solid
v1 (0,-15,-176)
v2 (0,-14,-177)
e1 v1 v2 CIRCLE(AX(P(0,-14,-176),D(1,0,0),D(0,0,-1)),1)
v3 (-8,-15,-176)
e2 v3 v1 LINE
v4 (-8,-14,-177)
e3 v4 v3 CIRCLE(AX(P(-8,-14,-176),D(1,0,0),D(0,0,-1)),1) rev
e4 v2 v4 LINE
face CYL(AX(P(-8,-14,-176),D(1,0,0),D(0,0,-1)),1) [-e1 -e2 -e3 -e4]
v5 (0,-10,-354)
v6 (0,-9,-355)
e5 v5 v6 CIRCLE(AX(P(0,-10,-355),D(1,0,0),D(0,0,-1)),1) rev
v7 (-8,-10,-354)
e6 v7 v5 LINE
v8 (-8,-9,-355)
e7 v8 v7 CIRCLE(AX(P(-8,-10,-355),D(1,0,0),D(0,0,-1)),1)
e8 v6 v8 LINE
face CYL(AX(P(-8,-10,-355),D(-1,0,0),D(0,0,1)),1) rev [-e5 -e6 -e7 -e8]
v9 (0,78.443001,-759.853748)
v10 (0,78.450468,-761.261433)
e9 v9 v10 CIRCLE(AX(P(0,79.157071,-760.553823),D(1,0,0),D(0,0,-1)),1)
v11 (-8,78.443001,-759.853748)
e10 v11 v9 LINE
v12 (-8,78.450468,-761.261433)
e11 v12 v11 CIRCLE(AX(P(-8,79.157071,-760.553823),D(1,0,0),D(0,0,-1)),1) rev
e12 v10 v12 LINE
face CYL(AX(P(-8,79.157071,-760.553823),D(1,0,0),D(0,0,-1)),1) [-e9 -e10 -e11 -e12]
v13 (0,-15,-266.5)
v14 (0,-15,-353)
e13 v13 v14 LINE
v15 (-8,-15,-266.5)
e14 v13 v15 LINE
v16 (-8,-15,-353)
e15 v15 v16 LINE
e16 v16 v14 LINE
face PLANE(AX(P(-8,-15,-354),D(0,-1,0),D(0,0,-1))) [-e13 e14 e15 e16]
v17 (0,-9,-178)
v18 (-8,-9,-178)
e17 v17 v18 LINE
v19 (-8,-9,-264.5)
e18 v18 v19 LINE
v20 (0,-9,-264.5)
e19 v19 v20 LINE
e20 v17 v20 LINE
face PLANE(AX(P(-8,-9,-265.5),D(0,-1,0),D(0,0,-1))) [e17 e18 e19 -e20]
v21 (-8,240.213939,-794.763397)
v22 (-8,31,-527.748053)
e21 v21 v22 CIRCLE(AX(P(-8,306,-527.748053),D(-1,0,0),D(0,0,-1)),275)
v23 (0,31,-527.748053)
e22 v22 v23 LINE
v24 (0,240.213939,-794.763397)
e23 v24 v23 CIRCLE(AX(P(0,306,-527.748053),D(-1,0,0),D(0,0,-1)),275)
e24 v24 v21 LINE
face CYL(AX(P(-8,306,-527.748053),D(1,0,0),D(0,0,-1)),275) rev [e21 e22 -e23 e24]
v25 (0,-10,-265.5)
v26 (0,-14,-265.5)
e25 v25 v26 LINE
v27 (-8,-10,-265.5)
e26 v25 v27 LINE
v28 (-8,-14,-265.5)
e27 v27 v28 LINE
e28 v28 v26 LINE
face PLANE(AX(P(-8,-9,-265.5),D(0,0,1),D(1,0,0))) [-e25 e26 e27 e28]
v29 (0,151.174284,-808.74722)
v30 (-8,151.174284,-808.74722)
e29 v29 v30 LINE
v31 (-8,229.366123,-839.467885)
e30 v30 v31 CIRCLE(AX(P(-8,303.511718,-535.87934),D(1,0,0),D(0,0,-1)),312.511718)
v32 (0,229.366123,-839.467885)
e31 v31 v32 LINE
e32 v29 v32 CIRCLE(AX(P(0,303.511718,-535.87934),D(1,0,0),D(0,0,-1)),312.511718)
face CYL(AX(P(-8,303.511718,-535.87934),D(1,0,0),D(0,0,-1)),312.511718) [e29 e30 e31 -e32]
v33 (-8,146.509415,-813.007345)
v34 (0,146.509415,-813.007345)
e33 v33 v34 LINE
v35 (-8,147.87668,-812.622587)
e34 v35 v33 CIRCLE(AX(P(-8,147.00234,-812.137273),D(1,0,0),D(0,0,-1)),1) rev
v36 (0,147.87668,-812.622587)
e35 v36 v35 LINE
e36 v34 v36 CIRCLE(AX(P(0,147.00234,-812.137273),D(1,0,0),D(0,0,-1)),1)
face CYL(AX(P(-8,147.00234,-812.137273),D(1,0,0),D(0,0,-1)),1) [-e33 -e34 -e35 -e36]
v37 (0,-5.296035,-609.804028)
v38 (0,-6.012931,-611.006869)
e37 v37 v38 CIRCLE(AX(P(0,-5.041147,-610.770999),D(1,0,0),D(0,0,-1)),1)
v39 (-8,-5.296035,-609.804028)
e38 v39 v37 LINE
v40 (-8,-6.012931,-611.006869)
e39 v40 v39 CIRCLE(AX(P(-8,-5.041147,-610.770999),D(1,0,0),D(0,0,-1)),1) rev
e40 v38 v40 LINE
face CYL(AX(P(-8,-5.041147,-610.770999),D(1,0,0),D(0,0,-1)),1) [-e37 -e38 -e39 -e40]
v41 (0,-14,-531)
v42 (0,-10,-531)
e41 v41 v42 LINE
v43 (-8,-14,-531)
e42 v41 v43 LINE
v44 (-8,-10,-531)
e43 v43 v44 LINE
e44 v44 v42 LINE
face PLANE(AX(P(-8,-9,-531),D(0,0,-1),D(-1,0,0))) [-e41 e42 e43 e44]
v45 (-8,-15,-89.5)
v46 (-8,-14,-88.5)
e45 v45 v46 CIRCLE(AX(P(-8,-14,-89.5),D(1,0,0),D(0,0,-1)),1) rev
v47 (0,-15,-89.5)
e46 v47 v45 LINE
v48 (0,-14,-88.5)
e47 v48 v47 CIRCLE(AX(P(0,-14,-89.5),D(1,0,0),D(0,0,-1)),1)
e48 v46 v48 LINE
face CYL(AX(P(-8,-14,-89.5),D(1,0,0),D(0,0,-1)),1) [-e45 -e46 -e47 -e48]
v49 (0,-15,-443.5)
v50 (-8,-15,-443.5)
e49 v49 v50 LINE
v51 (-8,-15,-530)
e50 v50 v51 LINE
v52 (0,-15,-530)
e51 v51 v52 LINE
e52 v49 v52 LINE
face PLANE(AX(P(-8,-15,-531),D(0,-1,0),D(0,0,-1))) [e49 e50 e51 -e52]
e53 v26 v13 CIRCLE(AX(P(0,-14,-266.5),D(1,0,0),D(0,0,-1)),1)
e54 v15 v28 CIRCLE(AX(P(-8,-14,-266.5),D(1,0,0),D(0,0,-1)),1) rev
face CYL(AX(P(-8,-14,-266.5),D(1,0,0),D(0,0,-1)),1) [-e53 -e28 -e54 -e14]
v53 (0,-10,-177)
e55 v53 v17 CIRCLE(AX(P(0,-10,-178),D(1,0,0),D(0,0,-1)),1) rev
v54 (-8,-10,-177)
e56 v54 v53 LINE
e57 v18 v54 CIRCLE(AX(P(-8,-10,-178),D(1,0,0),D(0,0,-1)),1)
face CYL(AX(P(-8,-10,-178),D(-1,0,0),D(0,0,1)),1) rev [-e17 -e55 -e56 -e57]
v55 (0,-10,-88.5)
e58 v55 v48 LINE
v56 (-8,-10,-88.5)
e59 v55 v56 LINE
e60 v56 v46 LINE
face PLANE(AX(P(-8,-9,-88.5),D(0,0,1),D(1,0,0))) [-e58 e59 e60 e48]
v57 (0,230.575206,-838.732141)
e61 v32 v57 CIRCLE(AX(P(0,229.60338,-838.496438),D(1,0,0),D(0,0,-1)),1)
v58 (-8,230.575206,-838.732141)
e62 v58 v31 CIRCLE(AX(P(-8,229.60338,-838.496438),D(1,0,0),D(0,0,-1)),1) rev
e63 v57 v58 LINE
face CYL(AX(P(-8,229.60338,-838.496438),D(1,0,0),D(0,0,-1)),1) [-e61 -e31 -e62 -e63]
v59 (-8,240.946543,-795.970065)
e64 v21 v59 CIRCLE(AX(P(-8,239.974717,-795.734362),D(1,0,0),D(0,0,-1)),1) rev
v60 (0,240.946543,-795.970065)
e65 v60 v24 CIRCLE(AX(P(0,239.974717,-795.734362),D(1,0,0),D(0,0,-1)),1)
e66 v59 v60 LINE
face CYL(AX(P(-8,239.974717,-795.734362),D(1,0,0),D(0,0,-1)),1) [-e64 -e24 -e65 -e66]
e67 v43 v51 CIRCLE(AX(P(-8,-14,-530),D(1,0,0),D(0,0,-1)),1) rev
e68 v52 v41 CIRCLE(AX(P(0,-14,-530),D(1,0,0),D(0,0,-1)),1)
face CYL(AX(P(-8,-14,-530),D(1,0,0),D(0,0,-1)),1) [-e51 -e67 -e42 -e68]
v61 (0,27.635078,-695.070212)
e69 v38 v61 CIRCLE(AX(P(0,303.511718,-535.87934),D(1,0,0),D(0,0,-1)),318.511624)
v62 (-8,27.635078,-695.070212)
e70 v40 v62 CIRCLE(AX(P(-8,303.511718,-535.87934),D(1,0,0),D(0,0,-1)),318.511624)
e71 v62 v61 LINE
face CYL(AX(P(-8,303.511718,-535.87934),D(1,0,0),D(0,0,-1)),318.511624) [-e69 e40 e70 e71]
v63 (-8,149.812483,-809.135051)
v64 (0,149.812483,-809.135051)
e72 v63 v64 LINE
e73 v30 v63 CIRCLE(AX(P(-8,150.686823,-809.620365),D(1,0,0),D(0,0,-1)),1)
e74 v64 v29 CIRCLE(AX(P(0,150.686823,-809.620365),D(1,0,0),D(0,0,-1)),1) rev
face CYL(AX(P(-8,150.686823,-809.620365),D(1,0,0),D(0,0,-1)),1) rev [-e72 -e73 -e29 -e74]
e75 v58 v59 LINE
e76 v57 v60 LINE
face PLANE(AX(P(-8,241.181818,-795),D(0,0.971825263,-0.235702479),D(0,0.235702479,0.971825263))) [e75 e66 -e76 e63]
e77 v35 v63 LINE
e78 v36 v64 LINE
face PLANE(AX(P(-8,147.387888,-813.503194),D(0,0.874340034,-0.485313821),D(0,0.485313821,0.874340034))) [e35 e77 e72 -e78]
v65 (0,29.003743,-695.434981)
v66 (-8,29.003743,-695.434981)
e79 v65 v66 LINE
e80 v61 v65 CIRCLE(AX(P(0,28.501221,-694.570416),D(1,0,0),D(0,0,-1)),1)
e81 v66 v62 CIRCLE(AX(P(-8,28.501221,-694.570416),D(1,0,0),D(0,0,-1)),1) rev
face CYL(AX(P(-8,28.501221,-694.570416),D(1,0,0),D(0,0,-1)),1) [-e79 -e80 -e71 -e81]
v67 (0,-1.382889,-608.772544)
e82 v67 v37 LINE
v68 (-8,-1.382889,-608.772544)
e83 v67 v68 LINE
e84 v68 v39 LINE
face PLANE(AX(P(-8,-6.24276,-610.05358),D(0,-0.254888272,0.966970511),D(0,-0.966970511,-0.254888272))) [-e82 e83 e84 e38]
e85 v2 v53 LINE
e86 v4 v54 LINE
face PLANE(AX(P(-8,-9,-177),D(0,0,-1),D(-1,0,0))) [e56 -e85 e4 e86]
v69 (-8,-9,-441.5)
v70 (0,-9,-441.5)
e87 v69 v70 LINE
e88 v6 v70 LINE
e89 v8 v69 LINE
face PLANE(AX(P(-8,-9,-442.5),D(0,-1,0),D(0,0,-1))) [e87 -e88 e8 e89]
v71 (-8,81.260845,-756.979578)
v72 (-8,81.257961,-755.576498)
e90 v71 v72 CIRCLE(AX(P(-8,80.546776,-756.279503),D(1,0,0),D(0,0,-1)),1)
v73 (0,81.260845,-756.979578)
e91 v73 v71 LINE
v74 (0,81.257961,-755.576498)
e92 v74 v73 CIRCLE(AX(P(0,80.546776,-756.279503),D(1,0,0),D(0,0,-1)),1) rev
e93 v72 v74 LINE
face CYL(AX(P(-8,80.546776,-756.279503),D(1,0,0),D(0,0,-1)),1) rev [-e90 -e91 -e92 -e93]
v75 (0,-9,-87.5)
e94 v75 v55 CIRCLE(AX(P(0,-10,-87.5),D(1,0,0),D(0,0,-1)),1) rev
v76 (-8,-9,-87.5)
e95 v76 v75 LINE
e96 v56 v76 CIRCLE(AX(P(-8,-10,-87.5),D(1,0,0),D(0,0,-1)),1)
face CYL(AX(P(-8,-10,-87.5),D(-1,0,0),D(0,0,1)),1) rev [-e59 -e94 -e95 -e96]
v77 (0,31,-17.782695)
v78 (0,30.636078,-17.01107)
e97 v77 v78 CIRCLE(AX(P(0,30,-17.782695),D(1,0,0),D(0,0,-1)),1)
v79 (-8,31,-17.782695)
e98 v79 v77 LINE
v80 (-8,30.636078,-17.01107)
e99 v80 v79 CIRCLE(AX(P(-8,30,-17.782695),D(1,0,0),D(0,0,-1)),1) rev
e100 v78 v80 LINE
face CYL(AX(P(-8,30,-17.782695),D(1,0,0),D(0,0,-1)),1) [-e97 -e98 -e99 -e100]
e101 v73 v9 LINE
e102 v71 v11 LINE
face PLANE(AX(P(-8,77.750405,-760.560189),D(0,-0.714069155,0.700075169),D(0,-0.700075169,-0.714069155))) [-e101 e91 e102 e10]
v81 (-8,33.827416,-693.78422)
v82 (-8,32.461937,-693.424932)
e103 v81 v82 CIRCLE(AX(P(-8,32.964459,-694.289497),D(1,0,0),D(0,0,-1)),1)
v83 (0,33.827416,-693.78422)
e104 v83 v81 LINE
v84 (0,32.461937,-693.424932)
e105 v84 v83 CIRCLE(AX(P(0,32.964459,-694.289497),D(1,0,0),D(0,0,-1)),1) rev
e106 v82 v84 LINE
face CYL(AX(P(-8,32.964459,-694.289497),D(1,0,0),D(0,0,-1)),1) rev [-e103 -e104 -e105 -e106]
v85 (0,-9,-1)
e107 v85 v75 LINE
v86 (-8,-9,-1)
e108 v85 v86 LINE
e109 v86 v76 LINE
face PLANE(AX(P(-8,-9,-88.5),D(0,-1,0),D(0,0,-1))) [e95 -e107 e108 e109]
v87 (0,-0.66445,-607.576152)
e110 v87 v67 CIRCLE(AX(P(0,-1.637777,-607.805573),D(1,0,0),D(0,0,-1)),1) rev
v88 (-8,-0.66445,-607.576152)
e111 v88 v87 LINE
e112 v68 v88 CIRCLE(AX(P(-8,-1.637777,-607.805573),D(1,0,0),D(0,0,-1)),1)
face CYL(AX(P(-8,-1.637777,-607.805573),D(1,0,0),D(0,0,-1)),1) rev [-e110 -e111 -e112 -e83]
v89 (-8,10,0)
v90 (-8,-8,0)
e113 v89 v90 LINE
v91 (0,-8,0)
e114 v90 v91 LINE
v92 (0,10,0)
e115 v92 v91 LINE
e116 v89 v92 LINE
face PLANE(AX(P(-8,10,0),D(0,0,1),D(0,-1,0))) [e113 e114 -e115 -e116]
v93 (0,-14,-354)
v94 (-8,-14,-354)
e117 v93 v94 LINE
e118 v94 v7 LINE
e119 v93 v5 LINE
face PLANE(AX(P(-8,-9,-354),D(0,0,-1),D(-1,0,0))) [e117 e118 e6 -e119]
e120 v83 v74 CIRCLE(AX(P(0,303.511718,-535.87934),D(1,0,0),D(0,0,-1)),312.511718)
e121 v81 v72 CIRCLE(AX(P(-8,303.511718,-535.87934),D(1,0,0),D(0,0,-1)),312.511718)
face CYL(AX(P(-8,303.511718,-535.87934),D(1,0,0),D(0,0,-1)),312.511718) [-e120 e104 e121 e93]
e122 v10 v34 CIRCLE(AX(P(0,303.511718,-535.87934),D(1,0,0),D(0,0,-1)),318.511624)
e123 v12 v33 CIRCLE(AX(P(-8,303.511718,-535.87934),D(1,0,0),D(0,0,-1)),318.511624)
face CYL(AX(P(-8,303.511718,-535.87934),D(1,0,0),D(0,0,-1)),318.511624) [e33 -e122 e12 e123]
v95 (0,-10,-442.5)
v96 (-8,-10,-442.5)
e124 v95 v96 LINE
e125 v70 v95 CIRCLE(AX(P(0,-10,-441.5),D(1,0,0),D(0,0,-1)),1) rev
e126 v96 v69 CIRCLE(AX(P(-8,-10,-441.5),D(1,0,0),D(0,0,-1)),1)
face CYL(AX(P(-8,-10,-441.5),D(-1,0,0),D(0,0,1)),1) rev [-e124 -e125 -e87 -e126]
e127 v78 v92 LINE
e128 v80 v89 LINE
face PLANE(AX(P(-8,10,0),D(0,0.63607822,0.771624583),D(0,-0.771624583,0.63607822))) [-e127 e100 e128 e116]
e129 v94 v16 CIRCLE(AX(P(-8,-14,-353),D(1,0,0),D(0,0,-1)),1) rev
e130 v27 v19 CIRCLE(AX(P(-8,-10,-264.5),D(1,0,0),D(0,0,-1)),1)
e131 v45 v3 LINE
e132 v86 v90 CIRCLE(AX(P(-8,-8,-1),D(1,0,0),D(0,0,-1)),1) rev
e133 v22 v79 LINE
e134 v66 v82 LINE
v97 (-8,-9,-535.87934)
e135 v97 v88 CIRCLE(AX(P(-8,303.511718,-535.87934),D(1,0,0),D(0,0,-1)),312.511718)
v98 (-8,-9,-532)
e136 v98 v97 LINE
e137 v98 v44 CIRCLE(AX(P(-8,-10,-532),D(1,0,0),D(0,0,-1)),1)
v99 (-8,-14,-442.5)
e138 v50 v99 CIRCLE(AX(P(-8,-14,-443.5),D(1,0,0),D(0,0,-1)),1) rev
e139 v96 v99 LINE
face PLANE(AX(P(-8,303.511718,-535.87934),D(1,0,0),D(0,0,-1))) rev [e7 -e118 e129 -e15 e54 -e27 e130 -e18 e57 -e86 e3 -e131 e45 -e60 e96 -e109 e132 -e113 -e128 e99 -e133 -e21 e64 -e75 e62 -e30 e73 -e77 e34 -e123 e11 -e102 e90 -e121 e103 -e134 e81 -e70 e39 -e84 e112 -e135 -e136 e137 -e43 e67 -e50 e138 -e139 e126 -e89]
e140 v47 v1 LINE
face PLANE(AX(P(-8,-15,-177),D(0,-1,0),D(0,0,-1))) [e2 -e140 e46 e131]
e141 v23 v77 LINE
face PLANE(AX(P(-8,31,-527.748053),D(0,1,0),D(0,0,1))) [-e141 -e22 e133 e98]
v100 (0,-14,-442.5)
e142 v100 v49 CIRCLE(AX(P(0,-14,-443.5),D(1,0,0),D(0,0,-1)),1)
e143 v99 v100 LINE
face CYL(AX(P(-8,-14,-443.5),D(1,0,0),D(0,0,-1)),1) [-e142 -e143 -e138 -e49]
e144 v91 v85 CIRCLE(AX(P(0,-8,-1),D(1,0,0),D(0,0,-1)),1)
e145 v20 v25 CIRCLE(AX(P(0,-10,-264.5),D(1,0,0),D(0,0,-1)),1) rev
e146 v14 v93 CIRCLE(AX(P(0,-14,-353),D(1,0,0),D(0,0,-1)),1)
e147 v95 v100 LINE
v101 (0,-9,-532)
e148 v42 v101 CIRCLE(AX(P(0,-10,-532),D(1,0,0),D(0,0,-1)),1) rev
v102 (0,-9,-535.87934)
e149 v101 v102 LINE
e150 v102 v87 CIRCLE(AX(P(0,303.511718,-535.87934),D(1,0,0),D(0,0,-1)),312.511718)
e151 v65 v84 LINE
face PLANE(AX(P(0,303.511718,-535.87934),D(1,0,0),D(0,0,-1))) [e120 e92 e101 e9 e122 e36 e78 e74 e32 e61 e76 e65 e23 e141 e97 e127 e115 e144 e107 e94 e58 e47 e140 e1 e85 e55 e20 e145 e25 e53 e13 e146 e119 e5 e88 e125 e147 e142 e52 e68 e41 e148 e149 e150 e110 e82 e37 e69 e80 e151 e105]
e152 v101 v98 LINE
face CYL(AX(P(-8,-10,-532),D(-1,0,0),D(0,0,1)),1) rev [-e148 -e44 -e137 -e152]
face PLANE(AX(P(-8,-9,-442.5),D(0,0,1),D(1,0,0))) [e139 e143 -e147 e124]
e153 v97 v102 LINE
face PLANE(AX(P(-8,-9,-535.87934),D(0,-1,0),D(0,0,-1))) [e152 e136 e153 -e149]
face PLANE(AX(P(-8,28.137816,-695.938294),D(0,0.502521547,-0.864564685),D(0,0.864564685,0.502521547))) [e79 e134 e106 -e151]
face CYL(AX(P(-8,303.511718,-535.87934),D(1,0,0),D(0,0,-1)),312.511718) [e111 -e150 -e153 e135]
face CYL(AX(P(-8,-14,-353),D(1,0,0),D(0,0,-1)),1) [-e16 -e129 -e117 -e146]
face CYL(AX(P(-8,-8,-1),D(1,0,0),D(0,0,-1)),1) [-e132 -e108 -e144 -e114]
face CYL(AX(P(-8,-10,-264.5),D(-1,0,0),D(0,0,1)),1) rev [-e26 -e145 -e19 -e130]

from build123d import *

# Parameters (mm, degrees)
BASE_FLANGE1_DEPTH = 8
FILLET_1_0_R       = 1


# Sheet-metal steps are written as plain solids
with BuildPart() as part:
    # Sketch1 → Base-Flange1 (new body)
    with BuildSketch(Plane(origin=(0, 0, 0), x_dir=(0, 0, -1), z_dir=(1, 0, 0))):
        with BuildLine():
            Line((531, -15), (442.5, -15))
            Line((442.5, -15), (442.5, -9))
            Line((442.5, -9), (354, -9))
            Line((354, -9), (354, -15))
            Line((354, -15), (265.5, -15))
            Line((265.5, -15), (265.5, -9))
            Line((265.5, -9), (177, -9))
            Line((177, -9), (177, -15))
            Line((177, -15), (88.5, -15))
            Line((88.5, -15), (88.5, -9))
            Line((88.5, -9), (0, -9))
            Line((0, -9), (0, 10))
            Line((0, 10), (17.311064102, 31))
            Line((17.311064102, 31), (527.748052756, 31))
            ThreePointArc((527.748052756, 31), (697.748052756, 89.840336788), (795, 241.181818182))
            Line((795, 241.181818182), (839.703962084, 230.339504132))
            ThreePointArc((839.703962084, 230.339504132), (826.746837948, 189.2327939), (808.257153356, 150.299771211))
            Line((808.257153356, 150.299771211), (813.503193561, 147.387888287))
            ThreePointArc((813.503193561, 147.387888287), (789.433768579, 110.742928998), (760.560188707, 77.750404912))
            Line((760.560188707, 77.750404912), (756.275511236, 81.951113323))
            ThreePointArc((756.275511236, 81.951113323), (726.159050553, 55.606079515), (692.923211747, 33.325122864))
            Line((692.923211747, 33.325122864), (695.938293543, 28.137816444))
            ThreePointArc((695.938293543, 28.137816444), (654.250802879, 7.812798402), (610.053579846, -6.242759659))
            Line((610.053579846, -6.242759659), (608.523872748, -0.439504608))
            ThreePointArc((608.523872748, -0.439504608), (572.452930854, -6.852497602), (535.879339812, -9))
            Line((535.879339812, -9), (531, -9))
            Line((531, -9), (531, -15))
        make_face()
    extrude(amount=-BASE_FLANGE1_DEPTH)

    # Fillet-1.0
    fillet_1_0_edges = [part.edges().sort_by_distance(p)[0] for p in [
        (-4, 31, -17.311064102),
        (-4, 241.181818182, -795),
        (-4, 230.339504132, -839.703962084),
        (-4, 150.299771211, -808.257153356),
        (-4, 147.387888287, -813.503193561),
        (-4, 77.750404912, -760.560188707),
        (-4, 81.951113323, -756.275511236),
        (-4, 33.325122864, -692.923211747),
        (-4, 28.137816444, -695.938293543),
        (-4, -6.242759659, -610.053579846),
        (-4, -0.439504608, -608.523872748),
        (-4, -9, -531),
        (-4, -15, -531),
        (-4, -15, -442.5),
        (-4, -9, -442.5),
        (-4, -9, -354),
        (-4, -15, -354),
        (-4, -15, -265.5),
        (-4, -9, -265.5),
        (-4, -9, -177),
        (-4, -15, -177),
        (-4, -15, -88.5),
        (-4, -9, -88.5),
        (-4, -9, 0),
    ]]
    fillet(fillet_1_0_edges, radius=FILLET_1_0_R)


solid = part.part
